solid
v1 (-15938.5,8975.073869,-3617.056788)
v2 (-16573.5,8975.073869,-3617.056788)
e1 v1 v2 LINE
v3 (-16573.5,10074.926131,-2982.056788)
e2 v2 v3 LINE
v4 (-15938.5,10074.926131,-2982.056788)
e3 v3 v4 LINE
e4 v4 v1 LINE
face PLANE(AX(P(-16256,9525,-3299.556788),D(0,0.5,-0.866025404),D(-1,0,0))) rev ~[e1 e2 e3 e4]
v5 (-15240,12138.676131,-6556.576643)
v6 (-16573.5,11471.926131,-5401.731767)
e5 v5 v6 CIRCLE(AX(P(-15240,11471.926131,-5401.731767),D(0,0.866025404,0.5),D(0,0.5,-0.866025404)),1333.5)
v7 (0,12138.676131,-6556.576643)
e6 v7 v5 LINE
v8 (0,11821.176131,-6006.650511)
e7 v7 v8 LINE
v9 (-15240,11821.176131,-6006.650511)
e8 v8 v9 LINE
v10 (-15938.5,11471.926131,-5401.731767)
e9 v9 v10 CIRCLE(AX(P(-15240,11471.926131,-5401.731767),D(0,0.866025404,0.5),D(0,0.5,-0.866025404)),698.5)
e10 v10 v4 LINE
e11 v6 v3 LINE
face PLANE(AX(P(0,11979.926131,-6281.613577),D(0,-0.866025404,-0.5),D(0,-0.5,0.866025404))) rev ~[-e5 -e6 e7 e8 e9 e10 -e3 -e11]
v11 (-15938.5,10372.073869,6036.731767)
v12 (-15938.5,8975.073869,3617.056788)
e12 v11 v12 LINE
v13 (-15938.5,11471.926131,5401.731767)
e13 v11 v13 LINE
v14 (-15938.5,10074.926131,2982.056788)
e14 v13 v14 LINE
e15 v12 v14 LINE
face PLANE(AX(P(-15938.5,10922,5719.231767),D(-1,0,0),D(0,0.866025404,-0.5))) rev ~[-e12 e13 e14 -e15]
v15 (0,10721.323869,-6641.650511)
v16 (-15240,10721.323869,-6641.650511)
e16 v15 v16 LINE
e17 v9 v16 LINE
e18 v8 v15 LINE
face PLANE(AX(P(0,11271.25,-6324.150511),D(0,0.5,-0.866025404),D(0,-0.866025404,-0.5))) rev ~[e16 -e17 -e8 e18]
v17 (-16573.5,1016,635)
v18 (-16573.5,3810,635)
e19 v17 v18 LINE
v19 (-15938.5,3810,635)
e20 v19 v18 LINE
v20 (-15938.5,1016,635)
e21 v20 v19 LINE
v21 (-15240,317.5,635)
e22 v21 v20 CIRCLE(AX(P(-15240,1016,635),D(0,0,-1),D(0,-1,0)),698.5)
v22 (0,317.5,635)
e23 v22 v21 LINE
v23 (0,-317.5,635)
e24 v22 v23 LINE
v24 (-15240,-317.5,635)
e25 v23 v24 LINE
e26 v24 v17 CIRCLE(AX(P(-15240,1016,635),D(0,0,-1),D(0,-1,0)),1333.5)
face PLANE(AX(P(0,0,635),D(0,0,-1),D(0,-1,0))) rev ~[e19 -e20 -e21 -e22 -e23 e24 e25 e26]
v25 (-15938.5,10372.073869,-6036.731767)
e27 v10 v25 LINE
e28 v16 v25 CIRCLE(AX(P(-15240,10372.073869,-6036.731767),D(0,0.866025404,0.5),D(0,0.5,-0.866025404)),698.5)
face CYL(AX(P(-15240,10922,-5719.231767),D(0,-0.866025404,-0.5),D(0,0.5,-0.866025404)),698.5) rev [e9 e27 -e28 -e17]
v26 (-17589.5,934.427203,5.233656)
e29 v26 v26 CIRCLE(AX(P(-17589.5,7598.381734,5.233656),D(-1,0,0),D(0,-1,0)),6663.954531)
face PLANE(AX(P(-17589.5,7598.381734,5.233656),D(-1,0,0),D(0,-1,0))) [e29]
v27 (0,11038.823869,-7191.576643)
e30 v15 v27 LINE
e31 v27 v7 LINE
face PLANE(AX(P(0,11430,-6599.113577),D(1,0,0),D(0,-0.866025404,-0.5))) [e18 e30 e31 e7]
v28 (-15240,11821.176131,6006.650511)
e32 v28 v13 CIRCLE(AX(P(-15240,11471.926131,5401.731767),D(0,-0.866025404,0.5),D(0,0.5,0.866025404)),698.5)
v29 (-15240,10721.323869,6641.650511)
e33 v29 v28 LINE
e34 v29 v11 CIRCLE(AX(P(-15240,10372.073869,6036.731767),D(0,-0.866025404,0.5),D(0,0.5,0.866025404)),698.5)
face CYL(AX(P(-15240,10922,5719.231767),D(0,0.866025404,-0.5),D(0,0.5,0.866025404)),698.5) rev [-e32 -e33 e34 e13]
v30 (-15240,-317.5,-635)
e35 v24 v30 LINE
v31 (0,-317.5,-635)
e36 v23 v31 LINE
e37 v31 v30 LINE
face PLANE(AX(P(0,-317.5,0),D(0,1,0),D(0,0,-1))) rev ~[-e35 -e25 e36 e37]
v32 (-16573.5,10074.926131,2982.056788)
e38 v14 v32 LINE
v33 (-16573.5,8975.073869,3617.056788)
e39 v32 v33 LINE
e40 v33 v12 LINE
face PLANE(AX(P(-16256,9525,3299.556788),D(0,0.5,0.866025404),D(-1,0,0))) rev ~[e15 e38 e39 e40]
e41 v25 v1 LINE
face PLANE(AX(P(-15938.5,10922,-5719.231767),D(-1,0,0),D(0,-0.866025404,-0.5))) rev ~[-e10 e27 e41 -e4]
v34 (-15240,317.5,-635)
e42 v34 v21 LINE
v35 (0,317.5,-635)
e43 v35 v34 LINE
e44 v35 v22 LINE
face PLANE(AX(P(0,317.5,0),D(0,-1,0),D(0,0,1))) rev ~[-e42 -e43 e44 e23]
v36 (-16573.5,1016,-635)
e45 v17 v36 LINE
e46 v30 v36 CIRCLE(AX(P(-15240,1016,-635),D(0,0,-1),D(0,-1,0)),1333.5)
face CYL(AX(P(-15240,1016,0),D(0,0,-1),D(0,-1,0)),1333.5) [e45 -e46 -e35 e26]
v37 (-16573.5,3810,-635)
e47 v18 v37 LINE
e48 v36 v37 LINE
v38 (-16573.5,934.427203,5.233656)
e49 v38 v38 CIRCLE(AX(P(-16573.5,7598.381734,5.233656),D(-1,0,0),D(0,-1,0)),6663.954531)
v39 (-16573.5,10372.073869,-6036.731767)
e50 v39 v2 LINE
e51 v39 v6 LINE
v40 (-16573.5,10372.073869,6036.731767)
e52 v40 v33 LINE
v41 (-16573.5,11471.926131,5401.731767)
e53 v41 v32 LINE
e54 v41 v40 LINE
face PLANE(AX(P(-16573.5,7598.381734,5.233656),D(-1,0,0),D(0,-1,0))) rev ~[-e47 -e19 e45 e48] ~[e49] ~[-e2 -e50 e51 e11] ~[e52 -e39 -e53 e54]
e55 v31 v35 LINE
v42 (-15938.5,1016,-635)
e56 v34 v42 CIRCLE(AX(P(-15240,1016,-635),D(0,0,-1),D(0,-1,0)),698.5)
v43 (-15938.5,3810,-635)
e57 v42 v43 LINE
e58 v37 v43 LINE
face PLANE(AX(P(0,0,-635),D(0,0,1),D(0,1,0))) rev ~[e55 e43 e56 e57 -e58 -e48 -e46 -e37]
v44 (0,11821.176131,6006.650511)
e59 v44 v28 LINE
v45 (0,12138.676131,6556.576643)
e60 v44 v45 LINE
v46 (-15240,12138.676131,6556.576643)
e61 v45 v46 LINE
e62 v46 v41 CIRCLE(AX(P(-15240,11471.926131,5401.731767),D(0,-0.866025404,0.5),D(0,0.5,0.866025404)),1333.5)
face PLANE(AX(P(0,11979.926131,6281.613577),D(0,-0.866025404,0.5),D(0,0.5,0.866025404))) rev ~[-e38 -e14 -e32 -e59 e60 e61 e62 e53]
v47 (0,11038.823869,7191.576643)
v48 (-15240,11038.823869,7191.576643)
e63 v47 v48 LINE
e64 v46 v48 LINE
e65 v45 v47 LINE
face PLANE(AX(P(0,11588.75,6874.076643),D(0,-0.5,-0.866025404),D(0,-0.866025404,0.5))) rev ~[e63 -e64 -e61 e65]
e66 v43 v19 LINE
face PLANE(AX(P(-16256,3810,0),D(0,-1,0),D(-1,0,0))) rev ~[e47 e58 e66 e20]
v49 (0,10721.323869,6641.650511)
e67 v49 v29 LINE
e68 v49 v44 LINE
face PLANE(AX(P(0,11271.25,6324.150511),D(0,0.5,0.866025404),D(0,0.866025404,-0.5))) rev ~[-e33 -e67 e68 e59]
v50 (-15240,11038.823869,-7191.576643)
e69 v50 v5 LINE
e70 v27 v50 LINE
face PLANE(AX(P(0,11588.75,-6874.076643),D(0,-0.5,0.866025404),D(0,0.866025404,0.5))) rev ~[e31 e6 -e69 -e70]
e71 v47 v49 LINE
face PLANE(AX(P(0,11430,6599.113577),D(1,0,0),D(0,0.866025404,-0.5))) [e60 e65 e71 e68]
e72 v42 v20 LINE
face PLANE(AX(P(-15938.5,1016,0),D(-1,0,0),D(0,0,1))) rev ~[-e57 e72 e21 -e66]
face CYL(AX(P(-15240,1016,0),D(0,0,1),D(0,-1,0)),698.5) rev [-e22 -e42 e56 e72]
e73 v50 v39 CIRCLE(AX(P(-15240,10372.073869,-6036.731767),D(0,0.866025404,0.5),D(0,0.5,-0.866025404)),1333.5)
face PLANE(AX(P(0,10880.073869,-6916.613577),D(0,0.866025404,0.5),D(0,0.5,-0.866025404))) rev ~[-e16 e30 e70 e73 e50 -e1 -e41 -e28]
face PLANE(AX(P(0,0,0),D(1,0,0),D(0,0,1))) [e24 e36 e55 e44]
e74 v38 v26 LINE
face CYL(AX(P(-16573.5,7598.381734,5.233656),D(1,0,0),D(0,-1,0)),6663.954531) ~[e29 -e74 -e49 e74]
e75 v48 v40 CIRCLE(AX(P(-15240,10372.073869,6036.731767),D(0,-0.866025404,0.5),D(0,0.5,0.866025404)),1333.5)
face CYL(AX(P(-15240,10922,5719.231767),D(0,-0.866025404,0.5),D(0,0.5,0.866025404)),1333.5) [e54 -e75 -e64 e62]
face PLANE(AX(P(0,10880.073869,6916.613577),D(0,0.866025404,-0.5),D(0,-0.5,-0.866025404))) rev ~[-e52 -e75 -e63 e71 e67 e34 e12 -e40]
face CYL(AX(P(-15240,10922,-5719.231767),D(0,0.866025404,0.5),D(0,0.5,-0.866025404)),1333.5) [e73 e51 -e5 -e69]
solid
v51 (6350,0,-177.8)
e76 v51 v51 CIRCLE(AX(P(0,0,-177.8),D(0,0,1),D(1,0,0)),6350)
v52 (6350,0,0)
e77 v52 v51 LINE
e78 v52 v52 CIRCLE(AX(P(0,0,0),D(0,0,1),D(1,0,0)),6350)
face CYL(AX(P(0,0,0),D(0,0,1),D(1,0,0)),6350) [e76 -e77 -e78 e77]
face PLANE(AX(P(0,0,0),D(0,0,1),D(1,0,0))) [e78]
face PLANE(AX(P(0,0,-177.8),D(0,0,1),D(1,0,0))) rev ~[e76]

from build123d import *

# Parameters (mm, degrees)
F0_R      = 6350
F1_DEPTH  = 177.8
F6_W      = 635
F6_H      = 1270
F10_COUNT = 3
F12_R     = 6663.9545311895
F13_DEPTH = 1016


with BuildPart() as f1:
    # F0 (on Top) → F1 (new body)
    with BuildSketch(Plane.XY):
        Circle(F0_R)
    extrude(amount=-F1_DEPTH)


with BuildPart() as f7:
    # F7: sweep along a path in F5
    with BuildLine(Plane.XY) as f7_path:
        Line((0, 0), (-15240, 0))
        ThreePointArc((-15240, 0), (-15958.4204896855, 297.5795103145), (-16256, 1016))
        Line((-16256, 1016), (-16256, 3810))
    # F6 (on face) → F7 (sweep)
    with BuildSketch(Plane.YZ):
        Rectangle(F6_W, F6_H)
    sweep(path=f7_path.line)


with BuildPart() as f10_1:
    # F10: instance of F7
    add(f7.part.rotate(Axis((-7049.0123681202, 7620, 0), (1, 0, 0)), 1 * 360 / F10_COUNT))


with BuildPart() as f10_2:
    # F10: instance of F7
    add(f7.part.rotate(Axis((-7049.0123681202, 7620, 0), (1, 0, 0)), 2 * 360 / F10_COUNT))


with BuildPart() as f7_1:
    add(f7.part)

    add(f10_1.part)  # F13 merges F10_1

    add(f10_2.part)  # F13 merges F10_2
    # F12 (on face) → F13 (join)
    with BuildSketch(Plane(origin=(-16573.5, 0, 0), x_dir=(0, -1, 0), z_dir=(-1, 0, 0))):
        with Locations((-7598.3817338374, 5.233656471)):
            Circle(F12_R)
    extrude(amount=F13_DEPTH)


solid = Compound([f1.part, f7_1.part])
